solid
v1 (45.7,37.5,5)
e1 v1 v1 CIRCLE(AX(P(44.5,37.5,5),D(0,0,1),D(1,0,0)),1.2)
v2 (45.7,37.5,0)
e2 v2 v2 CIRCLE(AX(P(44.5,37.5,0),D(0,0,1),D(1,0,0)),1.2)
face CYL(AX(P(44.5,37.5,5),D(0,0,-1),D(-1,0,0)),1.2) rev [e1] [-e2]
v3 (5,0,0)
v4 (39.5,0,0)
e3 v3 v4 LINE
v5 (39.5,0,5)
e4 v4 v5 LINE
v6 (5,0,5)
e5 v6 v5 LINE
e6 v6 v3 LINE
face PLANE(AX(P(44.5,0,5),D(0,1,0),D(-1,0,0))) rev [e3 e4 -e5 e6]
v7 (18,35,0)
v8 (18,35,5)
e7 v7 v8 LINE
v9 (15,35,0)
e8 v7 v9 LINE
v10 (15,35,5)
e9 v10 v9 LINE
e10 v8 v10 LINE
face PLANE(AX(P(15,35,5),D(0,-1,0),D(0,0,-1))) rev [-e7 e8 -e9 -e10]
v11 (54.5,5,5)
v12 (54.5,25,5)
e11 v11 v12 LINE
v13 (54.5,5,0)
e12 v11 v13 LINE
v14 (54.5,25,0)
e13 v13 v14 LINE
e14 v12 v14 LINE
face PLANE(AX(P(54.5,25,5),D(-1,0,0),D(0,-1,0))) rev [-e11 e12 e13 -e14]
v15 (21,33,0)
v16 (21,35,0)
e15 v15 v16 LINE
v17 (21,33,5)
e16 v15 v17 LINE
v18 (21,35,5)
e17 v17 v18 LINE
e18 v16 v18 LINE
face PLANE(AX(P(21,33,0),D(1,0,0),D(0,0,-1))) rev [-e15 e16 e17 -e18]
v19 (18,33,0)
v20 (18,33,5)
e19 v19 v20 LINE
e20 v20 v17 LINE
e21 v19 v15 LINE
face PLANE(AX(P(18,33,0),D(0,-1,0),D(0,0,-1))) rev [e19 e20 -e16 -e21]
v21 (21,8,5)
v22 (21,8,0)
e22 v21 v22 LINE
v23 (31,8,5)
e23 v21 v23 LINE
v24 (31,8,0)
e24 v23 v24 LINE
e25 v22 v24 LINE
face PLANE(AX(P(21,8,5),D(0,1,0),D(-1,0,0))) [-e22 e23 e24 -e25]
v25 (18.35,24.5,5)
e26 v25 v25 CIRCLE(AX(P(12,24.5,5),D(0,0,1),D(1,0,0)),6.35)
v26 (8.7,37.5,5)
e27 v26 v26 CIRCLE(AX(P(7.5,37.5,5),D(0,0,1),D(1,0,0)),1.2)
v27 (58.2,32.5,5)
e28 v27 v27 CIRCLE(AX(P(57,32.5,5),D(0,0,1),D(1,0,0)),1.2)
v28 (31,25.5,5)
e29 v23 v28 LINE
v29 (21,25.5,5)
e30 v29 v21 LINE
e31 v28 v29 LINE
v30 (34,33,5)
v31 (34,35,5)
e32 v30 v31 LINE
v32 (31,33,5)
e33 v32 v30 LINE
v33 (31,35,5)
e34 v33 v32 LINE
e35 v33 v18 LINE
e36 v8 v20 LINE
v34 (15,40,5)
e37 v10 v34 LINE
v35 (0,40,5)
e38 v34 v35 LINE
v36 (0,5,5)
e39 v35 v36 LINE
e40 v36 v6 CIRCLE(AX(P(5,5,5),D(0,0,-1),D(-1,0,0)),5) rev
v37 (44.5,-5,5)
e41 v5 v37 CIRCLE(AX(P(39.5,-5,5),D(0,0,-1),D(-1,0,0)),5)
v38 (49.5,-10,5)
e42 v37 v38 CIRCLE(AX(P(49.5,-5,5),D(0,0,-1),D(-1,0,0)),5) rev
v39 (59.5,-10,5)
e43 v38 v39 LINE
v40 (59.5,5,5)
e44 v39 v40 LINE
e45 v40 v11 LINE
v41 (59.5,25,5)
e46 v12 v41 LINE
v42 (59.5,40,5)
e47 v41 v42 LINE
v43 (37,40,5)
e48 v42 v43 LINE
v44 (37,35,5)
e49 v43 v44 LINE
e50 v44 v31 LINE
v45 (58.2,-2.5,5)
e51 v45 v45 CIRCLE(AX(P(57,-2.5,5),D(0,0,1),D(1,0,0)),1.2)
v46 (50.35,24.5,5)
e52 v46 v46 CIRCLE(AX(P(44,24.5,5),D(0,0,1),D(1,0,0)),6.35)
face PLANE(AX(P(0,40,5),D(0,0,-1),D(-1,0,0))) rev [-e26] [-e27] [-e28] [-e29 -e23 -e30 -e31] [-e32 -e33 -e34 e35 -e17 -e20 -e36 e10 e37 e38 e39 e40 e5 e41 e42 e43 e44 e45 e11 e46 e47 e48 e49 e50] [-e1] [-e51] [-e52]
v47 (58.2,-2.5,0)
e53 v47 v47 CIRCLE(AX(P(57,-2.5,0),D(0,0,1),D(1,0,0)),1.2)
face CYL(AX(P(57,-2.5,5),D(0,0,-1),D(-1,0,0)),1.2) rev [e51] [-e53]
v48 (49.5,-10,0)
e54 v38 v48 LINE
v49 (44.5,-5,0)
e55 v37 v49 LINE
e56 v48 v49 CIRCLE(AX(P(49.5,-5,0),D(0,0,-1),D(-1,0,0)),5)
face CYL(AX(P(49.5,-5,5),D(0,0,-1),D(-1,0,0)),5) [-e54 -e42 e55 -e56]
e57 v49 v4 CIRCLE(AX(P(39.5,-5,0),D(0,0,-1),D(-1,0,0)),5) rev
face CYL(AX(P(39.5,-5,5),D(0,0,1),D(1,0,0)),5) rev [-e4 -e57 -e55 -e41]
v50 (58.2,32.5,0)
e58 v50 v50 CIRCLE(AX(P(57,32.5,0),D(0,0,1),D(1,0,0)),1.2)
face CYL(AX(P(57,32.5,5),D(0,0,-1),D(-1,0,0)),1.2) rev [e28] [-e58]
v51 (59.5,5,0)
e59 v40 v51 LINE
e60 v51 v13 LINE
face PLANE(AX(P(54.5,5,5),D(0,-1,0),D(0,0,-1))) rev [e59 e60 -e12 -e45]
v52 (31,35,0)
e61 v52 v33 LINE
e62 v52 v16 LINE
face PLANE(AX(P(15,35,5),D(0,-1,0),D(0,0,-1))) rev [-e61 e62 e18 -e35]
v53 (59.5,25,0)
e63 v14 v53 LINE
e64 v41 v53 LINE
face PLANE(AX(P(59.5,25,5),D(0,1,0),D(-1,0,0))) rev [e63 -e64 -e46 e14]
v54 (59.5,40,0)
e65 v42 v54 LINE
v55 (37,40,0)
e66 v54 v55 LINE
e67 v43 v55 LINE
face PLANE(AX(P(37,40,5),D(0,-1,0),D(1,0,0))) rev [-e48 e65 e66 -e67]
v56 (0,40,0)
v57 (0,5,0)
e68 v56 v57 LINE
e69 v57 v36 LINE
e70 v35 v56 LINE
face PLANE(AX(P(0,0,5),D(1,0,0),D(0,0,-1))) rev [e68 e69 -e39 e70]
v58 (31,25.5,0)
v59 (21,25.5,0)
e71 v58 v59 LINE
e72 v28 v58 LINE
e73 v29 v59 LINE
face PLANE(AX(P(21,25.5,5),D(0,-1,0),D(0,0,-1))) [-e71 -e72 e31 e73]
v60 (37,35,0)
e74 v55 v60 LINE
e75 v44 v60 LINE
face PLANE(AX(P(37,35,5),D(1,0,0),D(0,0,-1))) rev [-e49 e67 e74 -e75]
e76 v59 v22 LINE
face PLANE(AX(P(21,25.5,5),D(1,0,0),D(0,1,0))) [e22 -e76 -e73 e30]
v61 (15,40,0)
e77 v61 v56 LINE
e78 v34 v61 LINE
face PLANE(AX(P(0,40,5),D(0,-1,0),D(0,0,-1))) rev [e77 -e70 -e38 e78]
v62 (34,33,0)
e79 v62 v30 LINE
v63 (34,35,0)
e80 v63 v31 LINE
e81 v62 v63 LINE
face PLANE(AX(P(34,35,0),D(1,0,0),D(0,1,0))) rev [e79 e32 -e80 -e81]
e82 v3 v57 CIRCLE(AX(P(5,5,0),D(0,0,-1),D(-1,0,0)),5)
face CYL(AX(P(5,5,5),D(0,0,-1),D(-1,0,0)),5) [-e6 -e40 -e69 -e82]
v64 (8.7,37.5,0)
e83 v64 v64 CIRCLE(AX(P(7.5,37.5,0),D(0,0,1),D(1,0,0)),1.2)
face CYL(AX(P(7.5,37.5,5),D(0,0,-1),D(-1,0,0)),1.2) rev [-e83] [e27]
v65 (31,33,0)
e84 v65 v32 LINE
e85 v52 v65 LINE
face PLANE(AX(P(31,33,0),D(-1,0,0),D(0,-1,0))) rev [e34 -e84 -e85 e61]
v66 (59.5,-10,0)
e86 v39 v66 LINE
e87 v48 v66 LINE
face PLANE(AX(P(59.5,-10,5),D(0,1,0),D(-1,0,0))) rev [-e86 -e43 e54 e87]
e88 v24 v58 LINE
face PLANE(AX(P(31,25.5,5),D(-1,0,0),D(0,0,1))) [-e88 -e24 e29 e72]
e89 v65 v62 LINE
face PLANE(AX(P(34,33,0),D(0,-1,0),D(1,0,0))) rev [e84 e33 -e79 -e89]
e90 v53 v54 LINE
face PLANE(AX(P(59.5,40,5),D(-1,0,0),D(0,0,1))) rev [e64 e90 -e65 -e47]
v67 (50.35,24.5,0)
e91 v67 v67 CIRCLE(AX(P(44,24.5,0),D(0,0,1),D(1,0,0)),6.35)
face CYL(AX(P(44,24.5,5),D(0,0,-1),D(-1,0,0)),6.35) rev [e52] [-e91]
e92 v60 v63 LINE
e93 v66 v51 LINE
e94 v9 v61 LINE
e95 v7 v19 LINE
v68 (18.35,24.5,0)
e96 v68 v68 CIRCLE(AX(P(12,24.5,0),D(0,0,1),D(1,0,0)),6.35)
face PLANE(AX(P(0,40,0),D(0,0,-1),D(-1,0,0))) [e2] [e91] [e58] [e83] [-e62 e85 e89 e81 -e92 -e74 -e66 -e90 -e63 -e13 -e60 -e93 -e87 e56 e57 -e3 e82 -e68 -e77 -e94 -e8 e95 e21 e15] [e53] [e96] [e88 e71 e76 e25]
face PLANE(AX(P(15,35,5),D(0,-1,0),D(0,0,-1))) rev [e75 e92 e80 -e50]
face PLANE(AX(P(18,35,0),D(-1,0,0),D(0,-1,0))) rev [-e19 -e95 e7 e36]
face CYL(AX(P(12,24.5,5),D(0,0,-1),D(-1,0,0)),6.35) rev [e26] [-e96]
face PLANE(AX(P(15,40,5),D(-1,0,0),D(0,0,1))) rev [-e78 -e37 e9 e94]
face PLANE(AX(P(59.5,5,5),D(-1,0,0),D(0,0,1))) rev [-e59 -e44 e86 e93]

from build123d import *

# Parameters (mm, degrees)
SKETCH1_R           = 6.35
SKETCH1_R_2         = 1.2
SKETCH1_W           = 10
SKETCH1_H           = 17.5
BOSS_EXTRUDE1_DEPTH = 5
SKETCH2_W           = 3
SKETCH2_H           = 2
CUT_EXTRUDE1_DEPTH  = 72.869673716
FILLET1_R           = 5


with BuildPart() as part:
    # Sketch1 → Boss-Extrude1 (new body)
    with BuildSketch(Plane.XY):
        Polygon((0, 40), (15, 40), (15, 35), (26, 35), (37, 35), (37, 40), (59.5, 40), (59.5, 25), (54.5, 25), (54.5, 5), (59.5, 5), (59.5, -10), (44.5, -10), (44.5, 0), (0, 0), align=None)
        with Locations((12, 24.5)):
            Circle(SKETCH1_R, mode=Mode.SUBTRACT)
        with Locations((44, 24.5)):
            Circle(SKETCH1_R, mode=Mode.SUBTRACT)
        with Locations((7.5, 37.5)):
            Circle(SKETCH1_R_2, mode=Mode.SUBTRACT)
        with Locations((44.5, 37.5)):
            Circle(SKETCH1_R_2, mode=Mode.SUBTRACT)
        with Locations((57, 32.5)):
            Circle(SKETCH1_R_2, mode=Mode.SUBTRACT)
        with Locations((57, -2.5)):
            Circle(SKETCH1_R_2, mode=Mode.SUBTRACT)
        with Locations((26, 16.75)):
            Rectangle(SKETCH1_W, SKETCH1_H, mode=Mode.SUBTRACT)
    extrude(amount=BOSS_EXTRUDE1_DEPTH)

    # Sketch2 → Cut-Extrude1 (cut, through all)
    with BuildSketch(Plane.XY.offset(5)):
        with Locations((19.5, 34)):
            Rectangle(SKETCH2_W, SKETCH2_H)
        with Locations((32.5, 34)):
            Rectangle(SKETCH2_W, SKETCH2_H)
    extrude(amount=-CUT_EXTRUDE1_DEPTH, mode=Mode.SUBTRACT)

    # Fillet1
    fillet1_edges = [part.edges().sort_by_distance(p)[0] for p in [
        (44.5, -10, 2.5),
        (44.5, 0, 2.5),
        (0, 0, 2.5),
    ]]
    fillet(fillet1_edges, radius=FILLET1_R - 0.0001)  # a hair under: the kernel refuses the full size


solid = part.part
